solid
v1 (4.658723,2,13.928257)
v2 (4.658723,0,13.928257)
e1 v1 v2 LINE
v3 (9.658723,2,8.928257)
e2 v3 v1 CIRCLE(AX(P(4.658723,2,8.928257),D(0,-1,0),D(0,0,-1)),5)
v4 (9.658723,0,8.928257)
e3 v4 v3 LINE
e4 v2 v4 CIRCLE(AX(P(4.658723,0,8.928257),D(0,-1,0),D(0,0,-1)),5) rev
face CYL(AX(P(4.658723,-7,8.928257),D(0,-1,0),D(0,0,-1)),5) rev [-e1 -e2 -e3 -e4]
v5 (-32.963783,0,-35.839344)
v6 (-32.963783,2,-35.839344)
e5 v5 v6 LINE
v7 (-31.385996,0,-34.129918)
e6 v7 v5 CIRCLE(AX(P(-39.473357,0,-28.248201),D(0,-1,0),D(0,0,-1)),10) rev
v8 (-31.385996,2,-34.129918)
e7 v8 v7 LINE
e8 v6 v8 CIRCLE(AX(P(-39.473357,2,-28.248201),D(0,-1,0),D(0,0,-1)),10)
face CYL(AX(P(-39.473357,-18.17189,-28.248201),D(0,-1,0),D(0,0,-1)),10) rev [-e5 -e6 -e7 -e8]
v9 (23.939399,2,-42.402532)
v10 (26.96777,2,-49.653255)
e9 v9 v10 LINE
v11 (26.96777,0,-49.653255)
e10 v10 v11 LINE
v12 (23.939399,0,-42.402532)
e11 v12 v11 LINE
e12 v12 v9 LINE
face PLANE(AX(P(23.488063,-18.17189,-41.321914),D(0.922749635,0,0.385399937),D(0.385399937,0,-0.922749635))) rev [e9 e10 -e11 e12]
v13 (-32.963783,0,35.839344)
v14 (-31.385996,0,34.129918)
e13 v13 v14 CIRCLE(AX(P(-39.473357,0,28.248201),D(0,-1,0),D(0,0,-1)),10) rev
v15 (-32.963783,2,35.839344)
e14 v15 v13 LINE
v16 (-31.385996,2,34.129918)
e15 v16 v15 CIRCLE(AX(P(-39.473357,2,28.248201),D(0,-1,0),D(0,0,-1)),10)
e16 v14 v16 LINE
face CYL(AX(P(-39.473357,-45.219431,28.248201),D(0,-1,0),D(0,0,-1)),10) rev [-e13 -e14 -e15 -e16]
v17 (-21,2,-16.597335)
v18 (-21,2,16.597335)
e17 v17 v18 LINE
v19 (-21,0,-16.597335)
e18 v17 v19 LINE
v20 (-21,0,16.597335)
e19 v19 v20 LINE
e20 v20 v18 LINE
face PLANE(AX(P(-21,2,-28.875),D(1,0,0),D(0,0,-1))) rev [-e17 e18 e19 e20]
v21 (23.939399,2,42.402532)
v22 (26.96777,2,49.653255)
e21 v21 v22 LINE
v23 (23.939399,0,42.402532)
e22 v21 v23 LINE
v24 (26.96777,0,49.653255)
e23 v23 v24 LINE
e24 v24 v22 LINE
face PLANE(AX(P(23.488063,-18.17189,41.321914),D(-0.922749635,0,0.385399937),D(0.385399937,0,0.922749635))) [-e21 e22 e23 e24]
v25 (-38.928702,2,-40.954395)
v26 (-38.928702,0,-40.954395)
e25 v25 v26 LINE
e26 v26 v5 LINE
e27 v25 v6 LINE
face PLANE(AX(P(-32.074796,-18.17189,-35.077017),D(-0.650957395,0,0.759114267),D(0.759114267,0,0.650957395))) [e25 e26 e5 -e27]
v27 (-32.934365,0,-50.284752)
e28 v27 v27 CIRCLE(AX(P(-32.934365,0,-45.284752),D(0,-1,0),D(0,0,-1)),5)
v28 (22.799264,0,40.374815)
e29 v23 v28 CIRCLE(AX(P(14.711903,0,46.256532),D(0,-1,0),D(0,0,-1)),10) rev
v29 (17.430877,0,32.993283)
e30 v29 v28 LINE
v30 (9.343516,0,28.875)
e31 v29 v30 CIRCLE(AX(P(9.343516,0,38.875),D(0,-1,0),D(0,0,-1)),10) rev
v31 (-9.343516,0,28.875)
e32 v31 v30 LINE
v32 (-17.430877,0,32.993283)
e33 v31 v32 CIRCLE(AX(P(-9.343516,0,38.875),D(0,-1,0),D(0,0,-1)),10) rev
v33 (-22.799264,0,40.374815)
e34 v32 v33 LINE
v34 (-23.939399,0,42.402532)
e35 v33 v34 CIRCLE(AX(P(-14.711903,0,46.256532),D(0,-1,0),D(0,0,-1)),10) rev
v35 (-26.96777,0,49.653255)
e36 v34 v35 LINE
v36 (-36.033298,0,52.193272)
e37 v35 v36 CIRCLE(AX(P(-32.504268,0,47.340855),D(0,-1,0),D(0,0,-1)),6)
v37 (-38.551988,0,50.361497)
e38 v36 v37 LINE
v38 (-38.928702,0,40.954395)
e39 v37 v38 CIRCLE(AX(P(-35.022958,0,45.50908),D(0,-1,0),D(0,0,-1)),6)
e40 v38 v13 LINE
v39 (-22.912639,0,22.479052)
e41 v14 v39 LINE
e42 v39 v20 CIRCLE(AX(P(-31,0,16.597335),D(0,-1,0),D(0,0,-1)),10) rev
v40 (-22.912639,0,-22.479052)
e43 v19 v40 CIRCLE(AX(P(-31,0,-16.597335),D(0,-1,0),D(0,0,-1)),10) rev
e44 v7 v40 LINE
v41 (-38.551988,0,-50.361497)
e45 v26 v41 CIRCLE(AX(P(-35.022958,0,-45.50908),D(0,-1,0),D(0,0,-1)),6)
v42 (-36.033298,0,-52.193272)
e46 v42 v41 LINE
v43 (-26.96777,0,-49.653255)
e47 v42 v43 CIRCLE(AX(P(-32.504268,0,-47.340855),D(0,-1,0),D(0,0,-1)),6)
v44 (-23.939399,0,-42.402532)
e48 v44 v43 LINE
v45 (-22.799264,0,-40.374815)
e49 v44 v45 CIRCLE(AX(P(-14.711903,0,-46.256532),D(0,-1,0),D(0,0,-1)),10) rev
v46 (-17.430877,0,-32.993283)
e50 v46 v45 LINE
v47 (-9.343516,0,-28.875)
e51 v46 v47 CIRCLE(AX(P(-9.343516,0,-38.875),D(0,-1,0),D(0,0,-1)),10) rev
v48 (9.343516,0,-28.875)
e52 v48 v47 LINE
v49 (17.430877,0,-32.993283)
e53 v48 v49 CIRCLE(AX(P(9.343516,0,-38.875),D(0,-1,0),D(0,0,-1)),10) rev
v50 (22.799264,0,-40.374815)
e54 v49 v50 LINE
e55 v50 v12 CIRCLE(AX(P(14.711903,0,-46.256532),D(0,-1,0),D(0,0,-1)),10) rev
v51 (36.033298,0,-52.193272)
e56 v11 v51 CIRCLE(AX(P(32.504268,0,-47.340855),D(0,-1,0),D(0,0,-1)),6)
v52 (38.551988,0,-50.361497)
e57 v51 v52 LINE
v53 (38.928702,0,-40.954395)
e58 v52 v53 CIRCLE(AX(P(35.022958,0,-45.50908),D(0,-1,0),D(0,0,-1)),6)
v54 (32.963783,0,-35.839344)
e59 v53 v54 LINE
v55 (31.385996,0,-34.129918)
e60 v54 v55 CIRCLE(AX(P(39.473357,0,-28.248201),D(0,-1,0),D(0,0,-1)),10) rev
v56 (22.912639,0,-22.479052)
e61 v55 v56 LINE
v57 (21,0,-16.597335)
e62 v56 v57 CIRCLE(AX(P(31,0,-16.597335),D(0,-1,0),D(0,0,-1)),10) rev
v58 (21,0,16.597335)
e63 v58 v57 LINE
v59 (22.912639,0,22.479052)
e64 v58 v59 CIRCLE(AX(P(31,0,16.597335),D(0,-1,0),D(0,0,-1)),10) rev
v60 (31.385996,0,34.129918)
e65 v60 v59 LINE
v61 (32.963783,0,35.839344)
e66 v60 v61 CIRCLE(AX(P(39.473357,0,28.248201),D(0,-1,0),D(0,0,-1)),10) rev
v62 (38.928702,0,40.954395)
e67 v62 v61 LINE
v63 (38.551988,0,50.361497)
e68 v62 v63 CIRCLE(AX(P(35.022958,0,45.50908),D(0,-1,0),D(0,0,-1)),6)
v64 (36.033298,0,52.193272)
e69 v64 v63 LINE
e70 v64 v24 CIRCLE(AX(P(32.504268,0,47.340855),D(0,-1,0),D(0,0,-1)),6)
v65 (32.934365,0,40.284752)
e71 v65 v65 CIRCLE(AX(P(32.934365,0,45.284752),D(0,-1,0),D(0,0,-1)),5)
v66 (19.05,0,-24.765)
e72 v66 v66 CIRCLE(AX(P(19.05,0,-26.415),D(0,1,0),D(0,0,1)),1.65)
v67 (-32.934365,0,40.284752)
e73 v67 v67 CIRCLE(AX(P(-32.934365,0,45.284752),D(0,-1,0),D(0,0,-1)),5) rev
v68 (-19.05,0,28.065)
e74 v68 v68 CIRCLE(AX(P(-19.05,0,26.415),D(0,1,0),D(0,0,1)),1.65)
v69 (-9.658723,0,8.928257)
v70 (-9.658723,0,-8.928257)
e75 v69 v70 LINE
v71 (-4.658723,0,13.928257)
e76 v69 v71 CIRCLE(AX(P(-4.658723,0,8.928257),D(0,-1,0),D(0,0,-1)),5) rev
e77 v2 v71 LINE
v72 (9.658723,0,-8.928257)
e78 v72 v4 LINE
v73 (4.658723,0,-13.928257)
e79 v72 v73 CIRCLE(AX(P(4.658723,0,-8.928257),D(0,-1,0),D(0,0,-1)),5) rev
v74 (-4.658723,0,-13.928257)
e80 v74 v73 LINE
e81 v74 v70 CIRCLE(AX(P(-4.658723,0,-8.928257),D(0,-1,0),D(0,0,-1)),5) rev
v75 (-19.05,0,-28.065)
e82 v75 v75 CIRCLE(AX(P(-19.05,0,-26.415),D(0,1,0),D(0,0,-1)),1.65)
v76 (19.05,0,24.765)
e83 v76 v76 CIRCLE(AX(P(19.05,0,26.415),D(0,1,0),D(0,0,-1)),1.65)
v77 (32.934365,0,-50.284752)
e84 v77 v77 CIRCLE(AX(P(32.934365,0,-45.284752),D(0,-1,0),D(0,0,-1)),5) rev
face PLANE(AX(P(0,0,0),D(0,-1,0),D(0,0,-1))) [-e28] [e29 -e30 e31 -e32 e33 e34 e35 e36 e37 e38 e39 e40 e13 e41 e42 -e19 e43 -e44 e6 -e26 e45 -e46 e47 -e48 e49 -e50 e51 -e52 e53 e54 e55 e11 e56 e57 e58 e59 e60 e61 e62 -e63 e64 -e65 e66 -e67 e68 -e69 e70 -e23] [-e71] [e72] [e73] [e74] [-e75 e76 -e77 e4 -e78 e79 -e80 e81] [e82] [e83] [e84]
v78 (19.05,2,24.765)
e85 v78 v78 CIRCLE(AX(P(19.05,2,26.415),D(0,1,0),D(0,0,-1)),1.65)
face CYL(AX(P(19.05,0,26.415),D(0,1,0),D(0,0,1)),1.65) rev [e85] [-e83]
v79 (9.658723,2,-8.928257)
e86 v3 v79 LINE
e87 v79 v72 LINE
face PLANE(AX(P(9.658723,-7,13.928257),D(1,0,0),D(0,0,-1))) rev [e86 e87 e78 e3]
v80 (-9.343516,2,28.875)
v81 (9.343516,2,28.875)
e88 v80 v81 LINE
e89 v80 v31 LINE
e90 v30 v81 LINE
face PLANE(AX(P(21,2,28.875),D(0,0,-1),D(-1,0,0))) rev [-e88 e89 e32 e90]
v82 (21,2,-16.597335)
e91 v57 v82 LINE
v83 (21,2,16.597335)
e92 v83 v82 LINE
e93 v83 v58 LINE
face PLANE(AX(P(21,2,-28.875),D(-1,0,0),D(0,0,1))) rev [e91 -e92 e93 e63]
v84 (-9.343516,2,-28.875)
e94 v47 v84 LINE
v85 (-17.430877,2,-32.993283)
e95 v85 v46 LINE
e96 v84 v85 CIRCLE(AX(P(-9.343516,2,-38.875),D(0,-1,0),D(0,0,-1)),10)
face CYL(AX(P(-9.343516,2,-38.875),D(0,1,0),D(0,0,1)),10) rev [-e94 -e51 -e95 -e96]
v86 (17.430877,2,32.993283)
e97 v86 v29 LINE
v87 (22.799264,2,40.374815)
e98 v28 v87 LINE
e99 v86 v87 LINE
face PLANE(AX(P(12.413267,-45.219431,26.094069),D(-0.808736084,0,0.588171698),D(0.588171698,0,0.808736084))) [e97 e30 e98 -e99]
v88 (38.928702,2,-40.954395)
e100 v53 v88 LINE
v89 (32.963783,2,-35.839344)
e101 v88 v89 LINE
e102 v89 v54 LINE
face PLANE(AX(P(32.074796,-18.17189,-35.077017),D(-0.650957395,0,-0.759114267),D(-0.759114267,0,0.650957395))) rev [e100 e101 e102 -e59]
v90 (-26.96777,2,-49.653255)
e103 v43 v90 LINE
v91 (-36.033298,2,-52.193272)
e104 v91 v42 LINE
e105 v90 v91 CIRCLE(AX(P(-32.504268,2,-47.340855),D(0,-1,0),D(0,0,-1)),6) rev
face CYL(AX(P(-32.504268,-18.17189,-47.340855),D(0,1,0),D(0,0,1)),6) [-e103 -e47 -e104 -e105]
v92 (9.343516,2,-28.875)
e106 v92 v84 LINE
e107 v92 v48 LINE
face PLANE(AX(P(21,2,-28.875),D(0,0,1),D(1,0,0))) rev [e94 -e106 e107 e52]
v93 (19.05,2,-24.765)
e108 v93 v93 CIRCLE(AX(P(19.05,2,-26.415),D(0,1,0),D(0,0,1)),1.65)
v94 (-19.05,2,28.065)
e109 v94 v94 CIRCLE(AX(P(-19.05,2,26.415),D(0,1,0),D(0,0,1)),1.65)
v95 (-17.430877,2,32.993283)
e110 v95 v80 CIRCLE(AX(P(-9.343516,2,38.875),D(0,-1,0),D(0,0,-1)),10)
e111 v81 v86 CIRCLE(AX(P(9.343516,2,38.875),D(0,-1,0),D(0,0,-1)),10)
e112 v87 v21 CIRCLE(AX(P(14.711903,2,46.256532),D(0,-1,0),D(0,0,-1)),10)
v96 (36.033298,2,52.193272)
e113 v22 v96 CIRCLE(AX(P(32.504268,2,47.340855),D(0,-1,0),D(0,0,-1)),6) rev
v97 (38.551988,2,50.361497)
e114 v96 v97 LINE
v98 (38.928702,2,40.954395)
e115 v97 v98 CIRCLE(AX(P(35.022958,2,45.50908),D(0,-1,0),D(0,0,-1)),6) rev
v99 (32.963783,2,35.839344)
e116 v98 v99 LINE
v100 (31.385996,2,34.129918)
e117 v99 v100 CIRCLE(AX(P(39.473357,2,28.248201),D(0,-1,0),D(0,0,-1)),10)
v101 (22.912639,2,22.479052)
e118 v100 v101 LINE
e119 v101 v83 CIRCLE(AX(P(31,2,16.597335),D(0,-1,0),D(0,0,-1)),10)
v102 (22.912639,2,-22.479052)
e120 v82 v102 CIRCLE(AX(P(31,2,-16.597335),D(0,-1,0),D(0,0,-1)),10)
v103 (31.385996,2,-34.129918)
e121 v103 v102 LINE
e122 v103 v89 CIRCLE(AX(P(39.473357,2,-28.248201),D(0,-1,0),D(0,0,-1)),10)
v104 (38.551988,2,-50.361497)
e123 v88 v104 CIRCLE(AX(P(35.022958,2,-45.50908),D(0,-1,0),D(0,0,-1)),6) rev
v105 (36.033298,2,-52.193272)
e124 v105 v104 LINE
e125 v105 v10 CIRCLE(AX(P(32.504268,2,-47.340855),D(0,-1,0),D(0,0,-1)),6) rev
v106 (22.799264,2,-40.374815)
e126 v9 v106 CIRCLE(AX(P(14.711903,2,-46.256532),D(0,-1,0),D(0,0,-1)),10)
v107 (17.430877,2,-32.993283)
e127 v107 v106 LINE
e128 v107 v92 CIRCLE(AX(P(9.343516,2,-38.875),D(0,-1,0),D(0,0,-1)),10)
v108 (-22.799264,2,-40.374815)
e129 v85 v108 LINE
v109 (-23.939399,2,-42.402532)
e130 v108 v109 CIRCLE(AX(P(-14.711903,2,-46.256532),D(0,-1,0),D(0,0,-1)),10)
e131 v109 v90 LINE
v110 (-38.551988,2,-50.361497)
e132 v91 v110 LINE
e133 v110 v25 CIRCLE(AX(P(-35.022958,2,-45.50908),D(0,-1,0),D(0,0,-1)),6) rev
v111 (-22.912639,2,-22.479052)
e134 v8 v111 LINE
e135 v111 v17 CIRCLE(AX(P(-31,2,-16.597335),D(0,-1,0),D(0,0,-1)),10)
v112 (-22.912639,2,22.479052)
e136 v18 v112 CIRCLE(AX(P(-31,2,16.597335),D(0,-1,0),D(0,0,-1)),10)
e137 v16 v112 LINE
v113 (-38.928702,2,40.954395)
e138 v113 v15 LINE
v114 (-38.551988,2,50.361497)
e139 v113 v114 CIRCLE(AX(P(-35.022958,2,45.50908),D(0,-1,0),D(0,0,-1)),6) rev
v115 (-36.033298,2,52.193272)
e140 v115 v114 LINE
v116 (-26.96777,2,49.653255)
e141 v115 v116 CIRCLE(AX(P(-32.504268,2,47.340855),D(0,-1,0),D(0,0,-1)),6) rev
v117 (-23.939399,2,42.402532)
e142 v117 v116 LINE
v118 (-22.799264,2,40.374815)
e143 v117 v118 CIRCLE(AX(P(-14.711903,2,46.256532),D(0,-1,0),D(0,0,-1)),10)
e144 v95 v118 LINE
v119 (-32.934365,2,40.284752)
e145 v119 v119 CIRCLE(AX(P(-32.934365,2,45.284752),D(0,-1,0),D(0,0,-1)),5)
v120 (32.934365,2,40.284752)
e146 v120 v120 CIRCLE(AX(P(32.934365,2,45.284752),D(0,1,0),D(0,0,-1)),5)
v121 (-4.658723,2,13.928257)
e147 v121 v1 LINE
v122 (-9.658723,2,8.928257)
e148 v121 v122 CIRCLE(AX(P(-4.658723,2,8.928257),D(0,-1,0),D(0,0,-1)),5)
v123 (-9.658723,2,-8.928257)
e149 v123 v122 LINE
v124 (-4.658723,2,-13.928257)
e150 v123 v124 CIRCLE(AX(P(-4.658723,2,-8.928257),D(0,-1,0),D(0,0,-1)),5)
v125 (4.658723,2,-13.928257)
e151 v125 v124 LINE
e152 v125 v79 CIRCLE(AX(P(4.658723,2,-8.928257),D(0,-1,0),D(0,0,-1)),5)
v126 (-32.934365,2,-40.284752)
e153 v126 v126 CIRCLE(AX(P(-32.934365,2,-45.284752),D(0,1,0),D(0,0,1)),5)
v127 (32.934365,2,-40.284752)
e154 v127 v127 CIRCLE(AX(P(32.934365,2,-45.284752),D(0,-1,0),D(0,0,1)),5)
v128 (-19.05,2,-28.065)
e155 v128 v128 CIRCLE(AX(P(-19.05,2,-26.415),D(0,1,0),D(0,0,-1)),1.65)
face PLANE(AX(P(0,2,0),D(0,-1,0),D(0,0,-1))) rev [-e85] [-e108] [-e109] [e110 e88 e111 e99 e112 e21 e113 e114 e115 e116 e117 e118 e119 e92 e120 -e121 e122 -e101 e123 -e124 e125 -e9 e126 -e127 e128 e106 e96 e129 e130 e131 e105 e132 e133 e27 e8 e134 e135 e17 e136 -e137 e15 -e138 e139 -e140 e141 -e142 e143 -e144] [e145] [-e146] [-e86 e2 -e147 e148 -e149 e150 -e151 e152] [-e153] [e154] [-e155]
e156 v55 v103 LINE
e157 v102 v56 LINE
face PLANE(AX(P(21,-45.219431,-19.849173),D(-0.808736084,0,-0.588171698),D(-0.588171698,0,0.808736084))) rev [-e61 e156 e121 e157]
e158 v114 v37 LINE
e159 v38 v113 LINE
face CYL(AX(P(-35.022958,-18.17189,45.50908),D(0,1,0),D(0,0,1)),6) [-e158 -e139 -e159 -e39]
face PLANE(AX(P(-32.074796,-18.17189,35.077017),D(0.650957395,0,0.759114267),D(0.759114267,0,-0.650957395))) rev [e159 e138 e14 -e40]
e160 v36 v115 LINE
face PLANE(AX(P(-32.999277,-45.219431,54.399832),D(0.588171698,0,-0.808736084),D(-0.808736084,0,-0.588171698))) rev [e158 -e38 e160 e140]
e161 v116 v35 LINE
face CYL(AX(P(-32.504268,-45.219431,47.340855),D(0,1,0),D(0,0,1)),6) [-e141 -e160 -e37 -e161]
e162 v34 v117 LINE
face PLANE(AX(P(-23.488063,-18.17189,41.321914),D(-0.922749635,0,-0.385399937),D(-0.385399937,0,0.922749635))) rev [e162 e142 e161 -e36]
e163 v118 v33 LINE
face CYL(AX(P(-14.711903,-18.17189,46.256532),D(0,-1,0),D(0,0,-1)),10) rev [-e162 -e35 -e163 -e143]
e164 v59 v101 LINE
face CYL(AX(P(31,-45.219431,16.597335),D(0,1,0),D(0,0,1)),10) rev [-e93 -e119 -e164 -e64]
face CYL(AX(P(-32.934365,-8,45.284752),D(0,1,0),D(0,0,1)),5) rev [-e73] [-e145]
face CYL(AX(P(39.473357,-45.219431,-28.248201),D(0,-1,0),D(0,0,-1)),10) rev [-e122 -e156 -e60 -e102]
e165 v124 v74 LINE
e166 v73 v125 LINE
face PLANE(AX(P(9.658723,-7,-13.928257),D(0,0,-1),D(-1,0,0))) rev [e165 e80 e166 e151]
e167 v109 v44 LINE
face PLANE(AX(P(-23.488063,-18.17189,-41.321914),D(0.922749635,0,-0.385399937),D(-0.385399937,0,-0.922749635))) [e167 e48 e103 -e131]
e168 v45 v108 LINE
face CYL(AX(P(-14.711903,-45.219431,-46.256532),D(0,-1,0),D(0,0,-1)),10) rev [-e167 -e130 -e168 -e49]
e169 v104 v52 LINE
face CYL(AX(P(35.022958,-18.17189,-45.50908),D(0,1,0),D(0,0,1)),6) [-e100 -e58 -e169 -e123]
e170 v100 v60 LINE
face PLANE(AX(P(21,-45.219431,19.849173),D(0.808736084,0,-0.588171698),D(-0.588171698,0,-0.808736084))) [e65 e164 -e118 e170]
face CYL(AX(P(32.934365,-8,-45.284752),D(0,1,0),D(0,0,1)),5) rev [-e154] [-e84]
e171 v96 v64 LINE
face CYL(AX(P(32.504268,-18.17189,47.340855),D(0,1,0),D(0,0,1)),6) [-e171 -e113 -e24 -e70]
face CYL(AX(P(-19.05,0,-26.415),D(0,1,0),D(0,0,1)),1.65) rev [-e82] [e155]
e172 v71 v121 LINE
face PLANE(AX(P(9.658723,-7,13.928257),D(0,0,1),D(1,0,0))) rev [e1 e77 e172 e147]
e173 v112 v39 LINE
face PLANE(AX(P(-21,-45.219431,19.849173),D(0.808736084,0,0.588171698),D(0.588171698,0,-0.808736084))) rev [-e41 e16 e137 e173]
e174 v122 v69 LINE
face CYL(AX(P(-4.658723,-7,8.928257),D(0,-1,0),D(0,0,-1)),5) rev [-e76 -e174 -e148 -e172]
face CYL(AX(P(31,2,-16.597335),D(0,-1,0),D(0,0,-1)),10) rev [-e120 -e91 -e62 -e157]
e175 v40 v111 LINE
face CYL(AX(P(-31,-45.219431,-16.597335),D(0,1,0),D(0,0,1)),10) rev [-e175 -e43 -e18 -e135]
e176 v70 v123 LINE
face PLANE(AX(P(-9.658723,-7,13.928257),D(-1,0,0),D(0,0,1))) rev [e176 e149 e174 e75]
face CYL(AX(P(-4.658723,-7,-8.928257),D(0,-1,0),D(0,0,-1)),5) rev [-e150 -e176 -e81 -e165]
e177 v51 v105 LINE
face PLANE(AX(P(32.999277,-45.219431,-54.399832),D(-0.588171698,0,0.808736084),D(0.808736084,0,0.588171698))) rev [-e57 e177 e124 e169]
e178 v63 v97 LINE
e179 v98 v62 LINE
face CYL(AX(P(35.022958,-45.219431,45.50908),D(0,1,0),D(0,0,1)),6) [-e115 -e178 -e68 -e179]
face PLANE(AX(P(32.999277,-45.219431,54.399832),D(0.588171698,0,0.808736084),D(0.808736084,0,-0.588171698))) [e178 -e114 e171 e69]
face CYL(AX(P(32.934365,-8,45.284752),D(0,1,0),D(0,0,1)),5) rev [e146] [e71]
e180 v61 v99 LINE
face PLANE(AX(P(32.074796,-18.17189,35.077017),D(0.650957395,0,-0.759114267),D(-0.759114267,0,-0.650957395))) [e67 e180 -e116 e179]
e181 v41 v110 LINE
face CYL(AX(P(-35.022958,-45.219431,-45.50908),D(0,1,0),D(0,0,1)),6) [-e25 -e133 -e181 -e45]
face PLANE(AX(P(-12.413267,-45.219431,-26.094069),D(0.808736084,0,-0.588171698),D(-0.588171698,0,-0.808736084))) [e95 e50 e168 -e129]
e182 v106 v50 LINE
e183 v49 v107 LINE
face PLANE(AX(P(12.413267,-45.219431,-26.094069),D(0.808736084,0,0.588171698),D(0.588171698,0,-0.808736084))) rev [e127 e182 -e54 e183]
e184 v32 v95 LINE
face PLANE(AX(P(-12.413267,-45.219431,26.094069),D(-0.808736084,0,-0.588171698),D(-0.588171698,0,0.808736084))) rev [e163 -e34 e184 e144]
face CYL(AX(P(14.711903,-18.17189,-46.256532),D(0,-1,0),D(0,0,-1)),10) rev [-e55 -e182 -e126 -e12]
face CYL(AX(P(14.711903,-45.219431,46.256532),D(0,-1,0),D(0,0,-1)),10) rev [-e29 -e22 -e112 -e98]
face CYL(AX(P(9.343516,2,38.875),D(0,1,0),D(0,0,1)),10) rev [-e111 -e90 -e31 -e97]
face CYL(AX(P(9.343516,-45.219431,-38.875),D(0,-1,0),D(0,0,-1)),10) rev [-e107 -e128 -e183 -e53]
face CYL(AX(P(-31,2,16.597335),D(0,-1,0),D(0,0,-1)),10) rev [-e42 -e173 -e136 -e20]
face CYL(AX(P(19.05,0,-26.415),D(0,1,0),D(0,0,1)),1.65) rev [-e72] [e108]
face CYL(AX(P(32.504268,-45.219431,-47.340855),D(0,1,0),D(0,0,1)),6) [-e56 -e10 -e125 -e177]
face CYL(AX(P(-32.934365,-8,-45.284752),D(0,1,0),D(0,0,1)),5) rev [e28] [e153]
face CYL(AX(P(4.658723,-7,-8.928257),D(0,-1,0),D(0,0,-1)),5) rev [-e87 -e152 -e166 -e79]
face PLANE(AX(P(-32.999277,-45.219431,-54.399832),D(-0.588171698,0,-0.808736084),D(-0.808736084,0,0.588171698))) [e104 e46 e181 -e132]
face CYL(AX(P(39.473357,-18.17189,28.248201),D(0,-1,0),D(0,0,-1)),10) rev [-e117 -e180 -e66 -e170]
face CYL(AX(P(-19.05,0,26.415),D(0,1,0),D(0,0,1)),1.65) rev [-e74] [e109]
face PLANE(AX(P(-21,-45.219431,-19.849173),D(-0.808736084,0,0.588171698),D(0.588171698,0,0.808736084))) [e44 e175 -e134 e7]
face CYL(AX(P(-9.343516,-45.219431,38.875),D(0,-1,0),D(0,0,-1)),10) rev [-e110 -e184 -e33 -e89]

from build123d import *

# Parameters (mm, degrees)
SKETCH_1_W             = 42
SKETCH_1_H             = 57.75
EXTRUDE_1_DEPTH        = 2
EXTRUDE_2_DEPTH        = 2
SKETCH_8_W             = 19.31744652
SKETCH_8_H             = 27.856514232
CUT_EXTRUDE_4_DEPTH    = 9
FILLET_4_R             = 5
SKETCH_5_R             = 5
CUT_EXTRUDE_6_DEPTH    = 10
EXTRUDE_3_DEPTH        = 2
FILLET_5_R             = 10
FILLET_6_R             = 6
FILLET_5_OF_MIRROR_1_R = 10
FILLET_6_OF_MIRROR_1_R = 6
MIRROR_2_OUTLINE_R     = 5
MIRROR_2_DEPTH         = 2
SKETCH_3_R             = 1.65
CUT_EXTRUDE_1_DEPTH    = 68.321095486
FILLET_7_R             = 10


# Read off the part's stored shape, not the designer's step: 镜向2
with BuildPart() as part:
    # 草图1 → 凸台-拉伸1 (new body)
    with BuildSketch(Plane(origin=(0, 0, 0), x_dir=(1, 0, 0), z_dir=(0, 1, 0))):
        Rectangle(SKETCH_1_W, SKETCH_1_H)
    extrude(amount=EXTRUDE_1_DEPTH)

    # 草图2 → 凸台-拉伸2 (add)
    with BuildSketch(Plane(origin=(0, 2, 0), x_dir=(1, 0, 0), z_dir=(0, 1, 0))):
        Polygon((-12.413267133, 26.094069469), (-21, 19.849172839), (-41.586009419, 48.154935789), (-32.999276552, 54.39983242), align=None)
    extrude_2 = extrude(amount=-EXTRUDE_2_DEPTH)

    # 草图8 → 切除-拉伸4 (cut)
    with BuildSketch(Plane(origin=(0, 2, 0), x_dir=(1, 0, 0), z_dir=(0, 1, 0))):
        Rectangle(SKETCH_8_W, SKETCH_8_H)
    extrude(amount=-CUT_EXTRUDE_4_DEPTH, mode=Mode.SUBTRACT)

    # 圆角4
    fillet_4_edges = [part.edges().sort_by_distance(p)[0] for p in [
        (-9.65872326, 1, 13.928257116),
        (-9.65872326, 1, -13.928257116),
        (9.65872326, 1, -13.928257116),
        (9.65872326, 1, 13.928257116),
    ]]
    fillet(fillet_4_edges, radius=FILLET_4_R)

    # 草图5 → 切除-拉伸6 (cut)
    with BuildSketch(Plane(origin=(0, 2, 0), x_dir=(1, 0, 0), z_dir=(0, 1, 0))):
        with Locations(Location((-32.934365155, 45.284752088, 0), (0, 0, 270))):
            Circle(SKETCH_5_R)
    cut_extrude_6 = extrude(amount=-CUT_EXTRUDE_6_DEPTH, mode=Mode.SUBTRACT)

    # 草图9 → 凸台-拉伸3 (add)
    with BuildSketch(Plane(origin=(0, 2, 0), x_dir=(1, 0, 0), z_dir=(0, 1, 0))):
        Polygon((-32.07479568, 35.077016899), (-44.691673686, 45.896270868), (-41.586009419, 48.154935789), align=None)
        Polygon((-23.488062813, 41.321913529), (-29.893612284, 56.658497342), (-32.999276552, 54.39983242), align=None)
    extrude_3 = extrude(amount=-EXTRUDE_3_DEPTH)

    # 圆角5
    fillet_5_edges = [part.edges().sort_by_distance(p)[0] for p in [
        (-32.07479568, 1, -35.077016899),
        (-23.488062813, 1, -41.321913529),
    ]]
    fillet(fillet_5_edges, radius=FILLET_5_R)

    # 圆角6
    fillet_6_edges = [part.edges().sort_by_distance(p)[0] for p in [
        (-44.691673686, 1, -45.896270868),
        (-29.893612284, 1, -56.658497342),
    ]]
    fillet(fillet_6_edges, radius=FILLET_6_R)

    # 镜向1: 凸台-拉伸2, 切除-拉伸6, 凸台-拉伸3 across plane
    add(extrude_2.mirror(Plane(origin=(0, 0, 0), x_dir=(0, 0, 1), z_dir=(1, 0, 0))))
    add(cut_extrude_6.mirror(Plane(origin=(0, 0, 0), x_dir=(0, 0, 1), z_dir=(1, 0, 0))), mode=Mode.SUBTRACT)
    add(extrude_3.mirror(Plane(origin=(0, 0, 0), x_dir=(0, 0, 1), z_dir=(1, 0, 0))))

    # 圆角5 of 镜向1
    fillet_5_of_mirror_1_edges = [part.edges().sort_by_distance(p)[0] for p in [
        (32.07479568, 1, -35.077016899),
        (23.488062813, 1, -41.321913529),
    ]]
    fillet(fillet_5_of_mirror_1_edges, radius=FILLET_5_OF_MIRROR_1_R)

    # 圆角6 of 镜向1
    fillet_6_of_mirror_1_edges = [part.edges().sort_by_distance(p)[0] for p in [
        (44.691673686, 1, -45.896270868),
        (29.893612284, 1, -56.658497342),
    ]]
    fillet(fillet_6_of_mirror_1_edges, radius=FILLET_6_OF_MIRROR_1_R)

    # 镜向2 outline → 镜向2 (add)
    # profile 1 of 2: a face of its own
    with BuildSketch(Plane(origin=(0, 0, 0), x_dir=(1, 0, 0), z_dir=(0, 1, 0))):
        with BuildLine():
            Line((21, -28.875), (14.435762065, -28.875))
            Line((14.435762065, -28.875), (22.799263539, -40.374814527))
            ThreePointArc((22.799263539, -40.374814527), (23.428494894, -41.355407098), (23.939399044, -42.402532133))
            Line((23.939399044, -42.402532133), (26.967769787, -49.653254641))
            ThreePointArc((26.967769787, -49.653254641), (30.885501706, -53.118362872), (36.033297782, -52.193271525))
            Line((36.033297782, -52.193271525), (38.551988188, -50.361496684))
            ThreePointArc((38.551988188, -50.361496684), (41.018152801, -45.749162076), (38.928702373, -40.954394579))
            Line((38.928702373, -40.954394579), (32.963783297, -35.839343585))
            ThreePointArc((32.963783297, -35.839343585), (32.12501319, -35.030666519), (31.385996405, -34.129917896))
            Line((31.385996405, -34.129917896), (21, -19.849172839))
            Line((21, -19.849172839), (21, -28.875))
        make_face()
        with Locations((32.934365155, -45.284752088)):
            Circle(MIRROR_2_OUTLINE_R, mode=Mode.SUBTRACT)
    # profile 2 of 2: a face of its own
    with BuildSketch(Plane(origin=(0, 0, 0), x_dir=(1, 0, 0), z_dir=(0, 1, 0))):
        with BuildLine():
            Line((-22.799263539, -40.374814527), (-14.435762065, -28.875))
            Line((-14.435762065, -28.875), (-21, -28.875))
            Line((-21, -28.875), (-21, -19.849172839))
            Line((-21, -19.849172839), (-31.385996405, -34.129917896))
            ThreePointArc((-31.385996405, -34.129917896), (-32.12501319, -35.030666519), (-32.963783297, -35.839343585))
            Line((-32.963783297, -35.839343585), (-38.928702373, -40.954394579))
            ThreePointArc((-38.928702373, -40.954394579), (-41.018152801, -45.749162076), (-38.551988188, -50.361496684))
            Line((-38.551988188, -50.361496684), (-36.033297782, -52.193271525))
            ThreePointArc((-36.033297782, -52.193271525), (-30.885501706, -53.118362872), (-26.967769787, -49.653254641))
            Line((-26.967769787, -49.653254641), (-23.939399044, -42.402532133))
            ThreePointArc((-23.939399044, -42.402532133), (-23.428494894, -41.355407098), (-22.799263539, -40.374814527))
        make_face()
        with Locations((-32.934365155, -45.284752088)):
            Circle(MIRROR_2_OUTLINE_R, mode=Mode.SUBTRACT)
    extrude(amount=MIRROR_2_DEPTH)

    # 草图3 → 切除-拉伸1 (cut, through all)
    with BuildSketch(Plane(origin=(0, 2, 0), x_dir=(1, 0, 0), z_dir=(0, 1, 0))):
        with Locations(Location((19.05, 26.415, 0), (0, 0, 270))):
            Circle(SKETCH_3_R)
        with Locations(Location((19.05, -26.415, 0), (0, 0, 90))):
            Circle(SKETCH_3_R)
        with Locations(Location((-19.05, -26.415, 0), (0, 0, 270))):
            Circle(SKETCH_3_R)
        with Locations(Location((-19.05, 26.415, 0), (0, 0, 90))):
            Circle(SKETCH_3_R)
    extrude(amount=-CUT_EXTRUDE_1_DEPTH, mode=Mode.SUBTRACT)

    # 圆角7
    fillet_7_edges = [part.edges().sort_by_distance(p)[0] for p in [
        (14.435762065, 1, -28.875),
        (21, 1, -19.849172839),
        (-21, 1, -19.849172839),
        (-14.435762065, 1, -28.875),
        (21, 1, 19.849172839),
        (14.435762065, 1, 28.875),
        (-14.435762065, 1, 28.875),
        (-21, 1, 19.849172839),
    ]]
    fillet(fillet_7_edges, radius=FILLET_7_R)


solid = part.part
